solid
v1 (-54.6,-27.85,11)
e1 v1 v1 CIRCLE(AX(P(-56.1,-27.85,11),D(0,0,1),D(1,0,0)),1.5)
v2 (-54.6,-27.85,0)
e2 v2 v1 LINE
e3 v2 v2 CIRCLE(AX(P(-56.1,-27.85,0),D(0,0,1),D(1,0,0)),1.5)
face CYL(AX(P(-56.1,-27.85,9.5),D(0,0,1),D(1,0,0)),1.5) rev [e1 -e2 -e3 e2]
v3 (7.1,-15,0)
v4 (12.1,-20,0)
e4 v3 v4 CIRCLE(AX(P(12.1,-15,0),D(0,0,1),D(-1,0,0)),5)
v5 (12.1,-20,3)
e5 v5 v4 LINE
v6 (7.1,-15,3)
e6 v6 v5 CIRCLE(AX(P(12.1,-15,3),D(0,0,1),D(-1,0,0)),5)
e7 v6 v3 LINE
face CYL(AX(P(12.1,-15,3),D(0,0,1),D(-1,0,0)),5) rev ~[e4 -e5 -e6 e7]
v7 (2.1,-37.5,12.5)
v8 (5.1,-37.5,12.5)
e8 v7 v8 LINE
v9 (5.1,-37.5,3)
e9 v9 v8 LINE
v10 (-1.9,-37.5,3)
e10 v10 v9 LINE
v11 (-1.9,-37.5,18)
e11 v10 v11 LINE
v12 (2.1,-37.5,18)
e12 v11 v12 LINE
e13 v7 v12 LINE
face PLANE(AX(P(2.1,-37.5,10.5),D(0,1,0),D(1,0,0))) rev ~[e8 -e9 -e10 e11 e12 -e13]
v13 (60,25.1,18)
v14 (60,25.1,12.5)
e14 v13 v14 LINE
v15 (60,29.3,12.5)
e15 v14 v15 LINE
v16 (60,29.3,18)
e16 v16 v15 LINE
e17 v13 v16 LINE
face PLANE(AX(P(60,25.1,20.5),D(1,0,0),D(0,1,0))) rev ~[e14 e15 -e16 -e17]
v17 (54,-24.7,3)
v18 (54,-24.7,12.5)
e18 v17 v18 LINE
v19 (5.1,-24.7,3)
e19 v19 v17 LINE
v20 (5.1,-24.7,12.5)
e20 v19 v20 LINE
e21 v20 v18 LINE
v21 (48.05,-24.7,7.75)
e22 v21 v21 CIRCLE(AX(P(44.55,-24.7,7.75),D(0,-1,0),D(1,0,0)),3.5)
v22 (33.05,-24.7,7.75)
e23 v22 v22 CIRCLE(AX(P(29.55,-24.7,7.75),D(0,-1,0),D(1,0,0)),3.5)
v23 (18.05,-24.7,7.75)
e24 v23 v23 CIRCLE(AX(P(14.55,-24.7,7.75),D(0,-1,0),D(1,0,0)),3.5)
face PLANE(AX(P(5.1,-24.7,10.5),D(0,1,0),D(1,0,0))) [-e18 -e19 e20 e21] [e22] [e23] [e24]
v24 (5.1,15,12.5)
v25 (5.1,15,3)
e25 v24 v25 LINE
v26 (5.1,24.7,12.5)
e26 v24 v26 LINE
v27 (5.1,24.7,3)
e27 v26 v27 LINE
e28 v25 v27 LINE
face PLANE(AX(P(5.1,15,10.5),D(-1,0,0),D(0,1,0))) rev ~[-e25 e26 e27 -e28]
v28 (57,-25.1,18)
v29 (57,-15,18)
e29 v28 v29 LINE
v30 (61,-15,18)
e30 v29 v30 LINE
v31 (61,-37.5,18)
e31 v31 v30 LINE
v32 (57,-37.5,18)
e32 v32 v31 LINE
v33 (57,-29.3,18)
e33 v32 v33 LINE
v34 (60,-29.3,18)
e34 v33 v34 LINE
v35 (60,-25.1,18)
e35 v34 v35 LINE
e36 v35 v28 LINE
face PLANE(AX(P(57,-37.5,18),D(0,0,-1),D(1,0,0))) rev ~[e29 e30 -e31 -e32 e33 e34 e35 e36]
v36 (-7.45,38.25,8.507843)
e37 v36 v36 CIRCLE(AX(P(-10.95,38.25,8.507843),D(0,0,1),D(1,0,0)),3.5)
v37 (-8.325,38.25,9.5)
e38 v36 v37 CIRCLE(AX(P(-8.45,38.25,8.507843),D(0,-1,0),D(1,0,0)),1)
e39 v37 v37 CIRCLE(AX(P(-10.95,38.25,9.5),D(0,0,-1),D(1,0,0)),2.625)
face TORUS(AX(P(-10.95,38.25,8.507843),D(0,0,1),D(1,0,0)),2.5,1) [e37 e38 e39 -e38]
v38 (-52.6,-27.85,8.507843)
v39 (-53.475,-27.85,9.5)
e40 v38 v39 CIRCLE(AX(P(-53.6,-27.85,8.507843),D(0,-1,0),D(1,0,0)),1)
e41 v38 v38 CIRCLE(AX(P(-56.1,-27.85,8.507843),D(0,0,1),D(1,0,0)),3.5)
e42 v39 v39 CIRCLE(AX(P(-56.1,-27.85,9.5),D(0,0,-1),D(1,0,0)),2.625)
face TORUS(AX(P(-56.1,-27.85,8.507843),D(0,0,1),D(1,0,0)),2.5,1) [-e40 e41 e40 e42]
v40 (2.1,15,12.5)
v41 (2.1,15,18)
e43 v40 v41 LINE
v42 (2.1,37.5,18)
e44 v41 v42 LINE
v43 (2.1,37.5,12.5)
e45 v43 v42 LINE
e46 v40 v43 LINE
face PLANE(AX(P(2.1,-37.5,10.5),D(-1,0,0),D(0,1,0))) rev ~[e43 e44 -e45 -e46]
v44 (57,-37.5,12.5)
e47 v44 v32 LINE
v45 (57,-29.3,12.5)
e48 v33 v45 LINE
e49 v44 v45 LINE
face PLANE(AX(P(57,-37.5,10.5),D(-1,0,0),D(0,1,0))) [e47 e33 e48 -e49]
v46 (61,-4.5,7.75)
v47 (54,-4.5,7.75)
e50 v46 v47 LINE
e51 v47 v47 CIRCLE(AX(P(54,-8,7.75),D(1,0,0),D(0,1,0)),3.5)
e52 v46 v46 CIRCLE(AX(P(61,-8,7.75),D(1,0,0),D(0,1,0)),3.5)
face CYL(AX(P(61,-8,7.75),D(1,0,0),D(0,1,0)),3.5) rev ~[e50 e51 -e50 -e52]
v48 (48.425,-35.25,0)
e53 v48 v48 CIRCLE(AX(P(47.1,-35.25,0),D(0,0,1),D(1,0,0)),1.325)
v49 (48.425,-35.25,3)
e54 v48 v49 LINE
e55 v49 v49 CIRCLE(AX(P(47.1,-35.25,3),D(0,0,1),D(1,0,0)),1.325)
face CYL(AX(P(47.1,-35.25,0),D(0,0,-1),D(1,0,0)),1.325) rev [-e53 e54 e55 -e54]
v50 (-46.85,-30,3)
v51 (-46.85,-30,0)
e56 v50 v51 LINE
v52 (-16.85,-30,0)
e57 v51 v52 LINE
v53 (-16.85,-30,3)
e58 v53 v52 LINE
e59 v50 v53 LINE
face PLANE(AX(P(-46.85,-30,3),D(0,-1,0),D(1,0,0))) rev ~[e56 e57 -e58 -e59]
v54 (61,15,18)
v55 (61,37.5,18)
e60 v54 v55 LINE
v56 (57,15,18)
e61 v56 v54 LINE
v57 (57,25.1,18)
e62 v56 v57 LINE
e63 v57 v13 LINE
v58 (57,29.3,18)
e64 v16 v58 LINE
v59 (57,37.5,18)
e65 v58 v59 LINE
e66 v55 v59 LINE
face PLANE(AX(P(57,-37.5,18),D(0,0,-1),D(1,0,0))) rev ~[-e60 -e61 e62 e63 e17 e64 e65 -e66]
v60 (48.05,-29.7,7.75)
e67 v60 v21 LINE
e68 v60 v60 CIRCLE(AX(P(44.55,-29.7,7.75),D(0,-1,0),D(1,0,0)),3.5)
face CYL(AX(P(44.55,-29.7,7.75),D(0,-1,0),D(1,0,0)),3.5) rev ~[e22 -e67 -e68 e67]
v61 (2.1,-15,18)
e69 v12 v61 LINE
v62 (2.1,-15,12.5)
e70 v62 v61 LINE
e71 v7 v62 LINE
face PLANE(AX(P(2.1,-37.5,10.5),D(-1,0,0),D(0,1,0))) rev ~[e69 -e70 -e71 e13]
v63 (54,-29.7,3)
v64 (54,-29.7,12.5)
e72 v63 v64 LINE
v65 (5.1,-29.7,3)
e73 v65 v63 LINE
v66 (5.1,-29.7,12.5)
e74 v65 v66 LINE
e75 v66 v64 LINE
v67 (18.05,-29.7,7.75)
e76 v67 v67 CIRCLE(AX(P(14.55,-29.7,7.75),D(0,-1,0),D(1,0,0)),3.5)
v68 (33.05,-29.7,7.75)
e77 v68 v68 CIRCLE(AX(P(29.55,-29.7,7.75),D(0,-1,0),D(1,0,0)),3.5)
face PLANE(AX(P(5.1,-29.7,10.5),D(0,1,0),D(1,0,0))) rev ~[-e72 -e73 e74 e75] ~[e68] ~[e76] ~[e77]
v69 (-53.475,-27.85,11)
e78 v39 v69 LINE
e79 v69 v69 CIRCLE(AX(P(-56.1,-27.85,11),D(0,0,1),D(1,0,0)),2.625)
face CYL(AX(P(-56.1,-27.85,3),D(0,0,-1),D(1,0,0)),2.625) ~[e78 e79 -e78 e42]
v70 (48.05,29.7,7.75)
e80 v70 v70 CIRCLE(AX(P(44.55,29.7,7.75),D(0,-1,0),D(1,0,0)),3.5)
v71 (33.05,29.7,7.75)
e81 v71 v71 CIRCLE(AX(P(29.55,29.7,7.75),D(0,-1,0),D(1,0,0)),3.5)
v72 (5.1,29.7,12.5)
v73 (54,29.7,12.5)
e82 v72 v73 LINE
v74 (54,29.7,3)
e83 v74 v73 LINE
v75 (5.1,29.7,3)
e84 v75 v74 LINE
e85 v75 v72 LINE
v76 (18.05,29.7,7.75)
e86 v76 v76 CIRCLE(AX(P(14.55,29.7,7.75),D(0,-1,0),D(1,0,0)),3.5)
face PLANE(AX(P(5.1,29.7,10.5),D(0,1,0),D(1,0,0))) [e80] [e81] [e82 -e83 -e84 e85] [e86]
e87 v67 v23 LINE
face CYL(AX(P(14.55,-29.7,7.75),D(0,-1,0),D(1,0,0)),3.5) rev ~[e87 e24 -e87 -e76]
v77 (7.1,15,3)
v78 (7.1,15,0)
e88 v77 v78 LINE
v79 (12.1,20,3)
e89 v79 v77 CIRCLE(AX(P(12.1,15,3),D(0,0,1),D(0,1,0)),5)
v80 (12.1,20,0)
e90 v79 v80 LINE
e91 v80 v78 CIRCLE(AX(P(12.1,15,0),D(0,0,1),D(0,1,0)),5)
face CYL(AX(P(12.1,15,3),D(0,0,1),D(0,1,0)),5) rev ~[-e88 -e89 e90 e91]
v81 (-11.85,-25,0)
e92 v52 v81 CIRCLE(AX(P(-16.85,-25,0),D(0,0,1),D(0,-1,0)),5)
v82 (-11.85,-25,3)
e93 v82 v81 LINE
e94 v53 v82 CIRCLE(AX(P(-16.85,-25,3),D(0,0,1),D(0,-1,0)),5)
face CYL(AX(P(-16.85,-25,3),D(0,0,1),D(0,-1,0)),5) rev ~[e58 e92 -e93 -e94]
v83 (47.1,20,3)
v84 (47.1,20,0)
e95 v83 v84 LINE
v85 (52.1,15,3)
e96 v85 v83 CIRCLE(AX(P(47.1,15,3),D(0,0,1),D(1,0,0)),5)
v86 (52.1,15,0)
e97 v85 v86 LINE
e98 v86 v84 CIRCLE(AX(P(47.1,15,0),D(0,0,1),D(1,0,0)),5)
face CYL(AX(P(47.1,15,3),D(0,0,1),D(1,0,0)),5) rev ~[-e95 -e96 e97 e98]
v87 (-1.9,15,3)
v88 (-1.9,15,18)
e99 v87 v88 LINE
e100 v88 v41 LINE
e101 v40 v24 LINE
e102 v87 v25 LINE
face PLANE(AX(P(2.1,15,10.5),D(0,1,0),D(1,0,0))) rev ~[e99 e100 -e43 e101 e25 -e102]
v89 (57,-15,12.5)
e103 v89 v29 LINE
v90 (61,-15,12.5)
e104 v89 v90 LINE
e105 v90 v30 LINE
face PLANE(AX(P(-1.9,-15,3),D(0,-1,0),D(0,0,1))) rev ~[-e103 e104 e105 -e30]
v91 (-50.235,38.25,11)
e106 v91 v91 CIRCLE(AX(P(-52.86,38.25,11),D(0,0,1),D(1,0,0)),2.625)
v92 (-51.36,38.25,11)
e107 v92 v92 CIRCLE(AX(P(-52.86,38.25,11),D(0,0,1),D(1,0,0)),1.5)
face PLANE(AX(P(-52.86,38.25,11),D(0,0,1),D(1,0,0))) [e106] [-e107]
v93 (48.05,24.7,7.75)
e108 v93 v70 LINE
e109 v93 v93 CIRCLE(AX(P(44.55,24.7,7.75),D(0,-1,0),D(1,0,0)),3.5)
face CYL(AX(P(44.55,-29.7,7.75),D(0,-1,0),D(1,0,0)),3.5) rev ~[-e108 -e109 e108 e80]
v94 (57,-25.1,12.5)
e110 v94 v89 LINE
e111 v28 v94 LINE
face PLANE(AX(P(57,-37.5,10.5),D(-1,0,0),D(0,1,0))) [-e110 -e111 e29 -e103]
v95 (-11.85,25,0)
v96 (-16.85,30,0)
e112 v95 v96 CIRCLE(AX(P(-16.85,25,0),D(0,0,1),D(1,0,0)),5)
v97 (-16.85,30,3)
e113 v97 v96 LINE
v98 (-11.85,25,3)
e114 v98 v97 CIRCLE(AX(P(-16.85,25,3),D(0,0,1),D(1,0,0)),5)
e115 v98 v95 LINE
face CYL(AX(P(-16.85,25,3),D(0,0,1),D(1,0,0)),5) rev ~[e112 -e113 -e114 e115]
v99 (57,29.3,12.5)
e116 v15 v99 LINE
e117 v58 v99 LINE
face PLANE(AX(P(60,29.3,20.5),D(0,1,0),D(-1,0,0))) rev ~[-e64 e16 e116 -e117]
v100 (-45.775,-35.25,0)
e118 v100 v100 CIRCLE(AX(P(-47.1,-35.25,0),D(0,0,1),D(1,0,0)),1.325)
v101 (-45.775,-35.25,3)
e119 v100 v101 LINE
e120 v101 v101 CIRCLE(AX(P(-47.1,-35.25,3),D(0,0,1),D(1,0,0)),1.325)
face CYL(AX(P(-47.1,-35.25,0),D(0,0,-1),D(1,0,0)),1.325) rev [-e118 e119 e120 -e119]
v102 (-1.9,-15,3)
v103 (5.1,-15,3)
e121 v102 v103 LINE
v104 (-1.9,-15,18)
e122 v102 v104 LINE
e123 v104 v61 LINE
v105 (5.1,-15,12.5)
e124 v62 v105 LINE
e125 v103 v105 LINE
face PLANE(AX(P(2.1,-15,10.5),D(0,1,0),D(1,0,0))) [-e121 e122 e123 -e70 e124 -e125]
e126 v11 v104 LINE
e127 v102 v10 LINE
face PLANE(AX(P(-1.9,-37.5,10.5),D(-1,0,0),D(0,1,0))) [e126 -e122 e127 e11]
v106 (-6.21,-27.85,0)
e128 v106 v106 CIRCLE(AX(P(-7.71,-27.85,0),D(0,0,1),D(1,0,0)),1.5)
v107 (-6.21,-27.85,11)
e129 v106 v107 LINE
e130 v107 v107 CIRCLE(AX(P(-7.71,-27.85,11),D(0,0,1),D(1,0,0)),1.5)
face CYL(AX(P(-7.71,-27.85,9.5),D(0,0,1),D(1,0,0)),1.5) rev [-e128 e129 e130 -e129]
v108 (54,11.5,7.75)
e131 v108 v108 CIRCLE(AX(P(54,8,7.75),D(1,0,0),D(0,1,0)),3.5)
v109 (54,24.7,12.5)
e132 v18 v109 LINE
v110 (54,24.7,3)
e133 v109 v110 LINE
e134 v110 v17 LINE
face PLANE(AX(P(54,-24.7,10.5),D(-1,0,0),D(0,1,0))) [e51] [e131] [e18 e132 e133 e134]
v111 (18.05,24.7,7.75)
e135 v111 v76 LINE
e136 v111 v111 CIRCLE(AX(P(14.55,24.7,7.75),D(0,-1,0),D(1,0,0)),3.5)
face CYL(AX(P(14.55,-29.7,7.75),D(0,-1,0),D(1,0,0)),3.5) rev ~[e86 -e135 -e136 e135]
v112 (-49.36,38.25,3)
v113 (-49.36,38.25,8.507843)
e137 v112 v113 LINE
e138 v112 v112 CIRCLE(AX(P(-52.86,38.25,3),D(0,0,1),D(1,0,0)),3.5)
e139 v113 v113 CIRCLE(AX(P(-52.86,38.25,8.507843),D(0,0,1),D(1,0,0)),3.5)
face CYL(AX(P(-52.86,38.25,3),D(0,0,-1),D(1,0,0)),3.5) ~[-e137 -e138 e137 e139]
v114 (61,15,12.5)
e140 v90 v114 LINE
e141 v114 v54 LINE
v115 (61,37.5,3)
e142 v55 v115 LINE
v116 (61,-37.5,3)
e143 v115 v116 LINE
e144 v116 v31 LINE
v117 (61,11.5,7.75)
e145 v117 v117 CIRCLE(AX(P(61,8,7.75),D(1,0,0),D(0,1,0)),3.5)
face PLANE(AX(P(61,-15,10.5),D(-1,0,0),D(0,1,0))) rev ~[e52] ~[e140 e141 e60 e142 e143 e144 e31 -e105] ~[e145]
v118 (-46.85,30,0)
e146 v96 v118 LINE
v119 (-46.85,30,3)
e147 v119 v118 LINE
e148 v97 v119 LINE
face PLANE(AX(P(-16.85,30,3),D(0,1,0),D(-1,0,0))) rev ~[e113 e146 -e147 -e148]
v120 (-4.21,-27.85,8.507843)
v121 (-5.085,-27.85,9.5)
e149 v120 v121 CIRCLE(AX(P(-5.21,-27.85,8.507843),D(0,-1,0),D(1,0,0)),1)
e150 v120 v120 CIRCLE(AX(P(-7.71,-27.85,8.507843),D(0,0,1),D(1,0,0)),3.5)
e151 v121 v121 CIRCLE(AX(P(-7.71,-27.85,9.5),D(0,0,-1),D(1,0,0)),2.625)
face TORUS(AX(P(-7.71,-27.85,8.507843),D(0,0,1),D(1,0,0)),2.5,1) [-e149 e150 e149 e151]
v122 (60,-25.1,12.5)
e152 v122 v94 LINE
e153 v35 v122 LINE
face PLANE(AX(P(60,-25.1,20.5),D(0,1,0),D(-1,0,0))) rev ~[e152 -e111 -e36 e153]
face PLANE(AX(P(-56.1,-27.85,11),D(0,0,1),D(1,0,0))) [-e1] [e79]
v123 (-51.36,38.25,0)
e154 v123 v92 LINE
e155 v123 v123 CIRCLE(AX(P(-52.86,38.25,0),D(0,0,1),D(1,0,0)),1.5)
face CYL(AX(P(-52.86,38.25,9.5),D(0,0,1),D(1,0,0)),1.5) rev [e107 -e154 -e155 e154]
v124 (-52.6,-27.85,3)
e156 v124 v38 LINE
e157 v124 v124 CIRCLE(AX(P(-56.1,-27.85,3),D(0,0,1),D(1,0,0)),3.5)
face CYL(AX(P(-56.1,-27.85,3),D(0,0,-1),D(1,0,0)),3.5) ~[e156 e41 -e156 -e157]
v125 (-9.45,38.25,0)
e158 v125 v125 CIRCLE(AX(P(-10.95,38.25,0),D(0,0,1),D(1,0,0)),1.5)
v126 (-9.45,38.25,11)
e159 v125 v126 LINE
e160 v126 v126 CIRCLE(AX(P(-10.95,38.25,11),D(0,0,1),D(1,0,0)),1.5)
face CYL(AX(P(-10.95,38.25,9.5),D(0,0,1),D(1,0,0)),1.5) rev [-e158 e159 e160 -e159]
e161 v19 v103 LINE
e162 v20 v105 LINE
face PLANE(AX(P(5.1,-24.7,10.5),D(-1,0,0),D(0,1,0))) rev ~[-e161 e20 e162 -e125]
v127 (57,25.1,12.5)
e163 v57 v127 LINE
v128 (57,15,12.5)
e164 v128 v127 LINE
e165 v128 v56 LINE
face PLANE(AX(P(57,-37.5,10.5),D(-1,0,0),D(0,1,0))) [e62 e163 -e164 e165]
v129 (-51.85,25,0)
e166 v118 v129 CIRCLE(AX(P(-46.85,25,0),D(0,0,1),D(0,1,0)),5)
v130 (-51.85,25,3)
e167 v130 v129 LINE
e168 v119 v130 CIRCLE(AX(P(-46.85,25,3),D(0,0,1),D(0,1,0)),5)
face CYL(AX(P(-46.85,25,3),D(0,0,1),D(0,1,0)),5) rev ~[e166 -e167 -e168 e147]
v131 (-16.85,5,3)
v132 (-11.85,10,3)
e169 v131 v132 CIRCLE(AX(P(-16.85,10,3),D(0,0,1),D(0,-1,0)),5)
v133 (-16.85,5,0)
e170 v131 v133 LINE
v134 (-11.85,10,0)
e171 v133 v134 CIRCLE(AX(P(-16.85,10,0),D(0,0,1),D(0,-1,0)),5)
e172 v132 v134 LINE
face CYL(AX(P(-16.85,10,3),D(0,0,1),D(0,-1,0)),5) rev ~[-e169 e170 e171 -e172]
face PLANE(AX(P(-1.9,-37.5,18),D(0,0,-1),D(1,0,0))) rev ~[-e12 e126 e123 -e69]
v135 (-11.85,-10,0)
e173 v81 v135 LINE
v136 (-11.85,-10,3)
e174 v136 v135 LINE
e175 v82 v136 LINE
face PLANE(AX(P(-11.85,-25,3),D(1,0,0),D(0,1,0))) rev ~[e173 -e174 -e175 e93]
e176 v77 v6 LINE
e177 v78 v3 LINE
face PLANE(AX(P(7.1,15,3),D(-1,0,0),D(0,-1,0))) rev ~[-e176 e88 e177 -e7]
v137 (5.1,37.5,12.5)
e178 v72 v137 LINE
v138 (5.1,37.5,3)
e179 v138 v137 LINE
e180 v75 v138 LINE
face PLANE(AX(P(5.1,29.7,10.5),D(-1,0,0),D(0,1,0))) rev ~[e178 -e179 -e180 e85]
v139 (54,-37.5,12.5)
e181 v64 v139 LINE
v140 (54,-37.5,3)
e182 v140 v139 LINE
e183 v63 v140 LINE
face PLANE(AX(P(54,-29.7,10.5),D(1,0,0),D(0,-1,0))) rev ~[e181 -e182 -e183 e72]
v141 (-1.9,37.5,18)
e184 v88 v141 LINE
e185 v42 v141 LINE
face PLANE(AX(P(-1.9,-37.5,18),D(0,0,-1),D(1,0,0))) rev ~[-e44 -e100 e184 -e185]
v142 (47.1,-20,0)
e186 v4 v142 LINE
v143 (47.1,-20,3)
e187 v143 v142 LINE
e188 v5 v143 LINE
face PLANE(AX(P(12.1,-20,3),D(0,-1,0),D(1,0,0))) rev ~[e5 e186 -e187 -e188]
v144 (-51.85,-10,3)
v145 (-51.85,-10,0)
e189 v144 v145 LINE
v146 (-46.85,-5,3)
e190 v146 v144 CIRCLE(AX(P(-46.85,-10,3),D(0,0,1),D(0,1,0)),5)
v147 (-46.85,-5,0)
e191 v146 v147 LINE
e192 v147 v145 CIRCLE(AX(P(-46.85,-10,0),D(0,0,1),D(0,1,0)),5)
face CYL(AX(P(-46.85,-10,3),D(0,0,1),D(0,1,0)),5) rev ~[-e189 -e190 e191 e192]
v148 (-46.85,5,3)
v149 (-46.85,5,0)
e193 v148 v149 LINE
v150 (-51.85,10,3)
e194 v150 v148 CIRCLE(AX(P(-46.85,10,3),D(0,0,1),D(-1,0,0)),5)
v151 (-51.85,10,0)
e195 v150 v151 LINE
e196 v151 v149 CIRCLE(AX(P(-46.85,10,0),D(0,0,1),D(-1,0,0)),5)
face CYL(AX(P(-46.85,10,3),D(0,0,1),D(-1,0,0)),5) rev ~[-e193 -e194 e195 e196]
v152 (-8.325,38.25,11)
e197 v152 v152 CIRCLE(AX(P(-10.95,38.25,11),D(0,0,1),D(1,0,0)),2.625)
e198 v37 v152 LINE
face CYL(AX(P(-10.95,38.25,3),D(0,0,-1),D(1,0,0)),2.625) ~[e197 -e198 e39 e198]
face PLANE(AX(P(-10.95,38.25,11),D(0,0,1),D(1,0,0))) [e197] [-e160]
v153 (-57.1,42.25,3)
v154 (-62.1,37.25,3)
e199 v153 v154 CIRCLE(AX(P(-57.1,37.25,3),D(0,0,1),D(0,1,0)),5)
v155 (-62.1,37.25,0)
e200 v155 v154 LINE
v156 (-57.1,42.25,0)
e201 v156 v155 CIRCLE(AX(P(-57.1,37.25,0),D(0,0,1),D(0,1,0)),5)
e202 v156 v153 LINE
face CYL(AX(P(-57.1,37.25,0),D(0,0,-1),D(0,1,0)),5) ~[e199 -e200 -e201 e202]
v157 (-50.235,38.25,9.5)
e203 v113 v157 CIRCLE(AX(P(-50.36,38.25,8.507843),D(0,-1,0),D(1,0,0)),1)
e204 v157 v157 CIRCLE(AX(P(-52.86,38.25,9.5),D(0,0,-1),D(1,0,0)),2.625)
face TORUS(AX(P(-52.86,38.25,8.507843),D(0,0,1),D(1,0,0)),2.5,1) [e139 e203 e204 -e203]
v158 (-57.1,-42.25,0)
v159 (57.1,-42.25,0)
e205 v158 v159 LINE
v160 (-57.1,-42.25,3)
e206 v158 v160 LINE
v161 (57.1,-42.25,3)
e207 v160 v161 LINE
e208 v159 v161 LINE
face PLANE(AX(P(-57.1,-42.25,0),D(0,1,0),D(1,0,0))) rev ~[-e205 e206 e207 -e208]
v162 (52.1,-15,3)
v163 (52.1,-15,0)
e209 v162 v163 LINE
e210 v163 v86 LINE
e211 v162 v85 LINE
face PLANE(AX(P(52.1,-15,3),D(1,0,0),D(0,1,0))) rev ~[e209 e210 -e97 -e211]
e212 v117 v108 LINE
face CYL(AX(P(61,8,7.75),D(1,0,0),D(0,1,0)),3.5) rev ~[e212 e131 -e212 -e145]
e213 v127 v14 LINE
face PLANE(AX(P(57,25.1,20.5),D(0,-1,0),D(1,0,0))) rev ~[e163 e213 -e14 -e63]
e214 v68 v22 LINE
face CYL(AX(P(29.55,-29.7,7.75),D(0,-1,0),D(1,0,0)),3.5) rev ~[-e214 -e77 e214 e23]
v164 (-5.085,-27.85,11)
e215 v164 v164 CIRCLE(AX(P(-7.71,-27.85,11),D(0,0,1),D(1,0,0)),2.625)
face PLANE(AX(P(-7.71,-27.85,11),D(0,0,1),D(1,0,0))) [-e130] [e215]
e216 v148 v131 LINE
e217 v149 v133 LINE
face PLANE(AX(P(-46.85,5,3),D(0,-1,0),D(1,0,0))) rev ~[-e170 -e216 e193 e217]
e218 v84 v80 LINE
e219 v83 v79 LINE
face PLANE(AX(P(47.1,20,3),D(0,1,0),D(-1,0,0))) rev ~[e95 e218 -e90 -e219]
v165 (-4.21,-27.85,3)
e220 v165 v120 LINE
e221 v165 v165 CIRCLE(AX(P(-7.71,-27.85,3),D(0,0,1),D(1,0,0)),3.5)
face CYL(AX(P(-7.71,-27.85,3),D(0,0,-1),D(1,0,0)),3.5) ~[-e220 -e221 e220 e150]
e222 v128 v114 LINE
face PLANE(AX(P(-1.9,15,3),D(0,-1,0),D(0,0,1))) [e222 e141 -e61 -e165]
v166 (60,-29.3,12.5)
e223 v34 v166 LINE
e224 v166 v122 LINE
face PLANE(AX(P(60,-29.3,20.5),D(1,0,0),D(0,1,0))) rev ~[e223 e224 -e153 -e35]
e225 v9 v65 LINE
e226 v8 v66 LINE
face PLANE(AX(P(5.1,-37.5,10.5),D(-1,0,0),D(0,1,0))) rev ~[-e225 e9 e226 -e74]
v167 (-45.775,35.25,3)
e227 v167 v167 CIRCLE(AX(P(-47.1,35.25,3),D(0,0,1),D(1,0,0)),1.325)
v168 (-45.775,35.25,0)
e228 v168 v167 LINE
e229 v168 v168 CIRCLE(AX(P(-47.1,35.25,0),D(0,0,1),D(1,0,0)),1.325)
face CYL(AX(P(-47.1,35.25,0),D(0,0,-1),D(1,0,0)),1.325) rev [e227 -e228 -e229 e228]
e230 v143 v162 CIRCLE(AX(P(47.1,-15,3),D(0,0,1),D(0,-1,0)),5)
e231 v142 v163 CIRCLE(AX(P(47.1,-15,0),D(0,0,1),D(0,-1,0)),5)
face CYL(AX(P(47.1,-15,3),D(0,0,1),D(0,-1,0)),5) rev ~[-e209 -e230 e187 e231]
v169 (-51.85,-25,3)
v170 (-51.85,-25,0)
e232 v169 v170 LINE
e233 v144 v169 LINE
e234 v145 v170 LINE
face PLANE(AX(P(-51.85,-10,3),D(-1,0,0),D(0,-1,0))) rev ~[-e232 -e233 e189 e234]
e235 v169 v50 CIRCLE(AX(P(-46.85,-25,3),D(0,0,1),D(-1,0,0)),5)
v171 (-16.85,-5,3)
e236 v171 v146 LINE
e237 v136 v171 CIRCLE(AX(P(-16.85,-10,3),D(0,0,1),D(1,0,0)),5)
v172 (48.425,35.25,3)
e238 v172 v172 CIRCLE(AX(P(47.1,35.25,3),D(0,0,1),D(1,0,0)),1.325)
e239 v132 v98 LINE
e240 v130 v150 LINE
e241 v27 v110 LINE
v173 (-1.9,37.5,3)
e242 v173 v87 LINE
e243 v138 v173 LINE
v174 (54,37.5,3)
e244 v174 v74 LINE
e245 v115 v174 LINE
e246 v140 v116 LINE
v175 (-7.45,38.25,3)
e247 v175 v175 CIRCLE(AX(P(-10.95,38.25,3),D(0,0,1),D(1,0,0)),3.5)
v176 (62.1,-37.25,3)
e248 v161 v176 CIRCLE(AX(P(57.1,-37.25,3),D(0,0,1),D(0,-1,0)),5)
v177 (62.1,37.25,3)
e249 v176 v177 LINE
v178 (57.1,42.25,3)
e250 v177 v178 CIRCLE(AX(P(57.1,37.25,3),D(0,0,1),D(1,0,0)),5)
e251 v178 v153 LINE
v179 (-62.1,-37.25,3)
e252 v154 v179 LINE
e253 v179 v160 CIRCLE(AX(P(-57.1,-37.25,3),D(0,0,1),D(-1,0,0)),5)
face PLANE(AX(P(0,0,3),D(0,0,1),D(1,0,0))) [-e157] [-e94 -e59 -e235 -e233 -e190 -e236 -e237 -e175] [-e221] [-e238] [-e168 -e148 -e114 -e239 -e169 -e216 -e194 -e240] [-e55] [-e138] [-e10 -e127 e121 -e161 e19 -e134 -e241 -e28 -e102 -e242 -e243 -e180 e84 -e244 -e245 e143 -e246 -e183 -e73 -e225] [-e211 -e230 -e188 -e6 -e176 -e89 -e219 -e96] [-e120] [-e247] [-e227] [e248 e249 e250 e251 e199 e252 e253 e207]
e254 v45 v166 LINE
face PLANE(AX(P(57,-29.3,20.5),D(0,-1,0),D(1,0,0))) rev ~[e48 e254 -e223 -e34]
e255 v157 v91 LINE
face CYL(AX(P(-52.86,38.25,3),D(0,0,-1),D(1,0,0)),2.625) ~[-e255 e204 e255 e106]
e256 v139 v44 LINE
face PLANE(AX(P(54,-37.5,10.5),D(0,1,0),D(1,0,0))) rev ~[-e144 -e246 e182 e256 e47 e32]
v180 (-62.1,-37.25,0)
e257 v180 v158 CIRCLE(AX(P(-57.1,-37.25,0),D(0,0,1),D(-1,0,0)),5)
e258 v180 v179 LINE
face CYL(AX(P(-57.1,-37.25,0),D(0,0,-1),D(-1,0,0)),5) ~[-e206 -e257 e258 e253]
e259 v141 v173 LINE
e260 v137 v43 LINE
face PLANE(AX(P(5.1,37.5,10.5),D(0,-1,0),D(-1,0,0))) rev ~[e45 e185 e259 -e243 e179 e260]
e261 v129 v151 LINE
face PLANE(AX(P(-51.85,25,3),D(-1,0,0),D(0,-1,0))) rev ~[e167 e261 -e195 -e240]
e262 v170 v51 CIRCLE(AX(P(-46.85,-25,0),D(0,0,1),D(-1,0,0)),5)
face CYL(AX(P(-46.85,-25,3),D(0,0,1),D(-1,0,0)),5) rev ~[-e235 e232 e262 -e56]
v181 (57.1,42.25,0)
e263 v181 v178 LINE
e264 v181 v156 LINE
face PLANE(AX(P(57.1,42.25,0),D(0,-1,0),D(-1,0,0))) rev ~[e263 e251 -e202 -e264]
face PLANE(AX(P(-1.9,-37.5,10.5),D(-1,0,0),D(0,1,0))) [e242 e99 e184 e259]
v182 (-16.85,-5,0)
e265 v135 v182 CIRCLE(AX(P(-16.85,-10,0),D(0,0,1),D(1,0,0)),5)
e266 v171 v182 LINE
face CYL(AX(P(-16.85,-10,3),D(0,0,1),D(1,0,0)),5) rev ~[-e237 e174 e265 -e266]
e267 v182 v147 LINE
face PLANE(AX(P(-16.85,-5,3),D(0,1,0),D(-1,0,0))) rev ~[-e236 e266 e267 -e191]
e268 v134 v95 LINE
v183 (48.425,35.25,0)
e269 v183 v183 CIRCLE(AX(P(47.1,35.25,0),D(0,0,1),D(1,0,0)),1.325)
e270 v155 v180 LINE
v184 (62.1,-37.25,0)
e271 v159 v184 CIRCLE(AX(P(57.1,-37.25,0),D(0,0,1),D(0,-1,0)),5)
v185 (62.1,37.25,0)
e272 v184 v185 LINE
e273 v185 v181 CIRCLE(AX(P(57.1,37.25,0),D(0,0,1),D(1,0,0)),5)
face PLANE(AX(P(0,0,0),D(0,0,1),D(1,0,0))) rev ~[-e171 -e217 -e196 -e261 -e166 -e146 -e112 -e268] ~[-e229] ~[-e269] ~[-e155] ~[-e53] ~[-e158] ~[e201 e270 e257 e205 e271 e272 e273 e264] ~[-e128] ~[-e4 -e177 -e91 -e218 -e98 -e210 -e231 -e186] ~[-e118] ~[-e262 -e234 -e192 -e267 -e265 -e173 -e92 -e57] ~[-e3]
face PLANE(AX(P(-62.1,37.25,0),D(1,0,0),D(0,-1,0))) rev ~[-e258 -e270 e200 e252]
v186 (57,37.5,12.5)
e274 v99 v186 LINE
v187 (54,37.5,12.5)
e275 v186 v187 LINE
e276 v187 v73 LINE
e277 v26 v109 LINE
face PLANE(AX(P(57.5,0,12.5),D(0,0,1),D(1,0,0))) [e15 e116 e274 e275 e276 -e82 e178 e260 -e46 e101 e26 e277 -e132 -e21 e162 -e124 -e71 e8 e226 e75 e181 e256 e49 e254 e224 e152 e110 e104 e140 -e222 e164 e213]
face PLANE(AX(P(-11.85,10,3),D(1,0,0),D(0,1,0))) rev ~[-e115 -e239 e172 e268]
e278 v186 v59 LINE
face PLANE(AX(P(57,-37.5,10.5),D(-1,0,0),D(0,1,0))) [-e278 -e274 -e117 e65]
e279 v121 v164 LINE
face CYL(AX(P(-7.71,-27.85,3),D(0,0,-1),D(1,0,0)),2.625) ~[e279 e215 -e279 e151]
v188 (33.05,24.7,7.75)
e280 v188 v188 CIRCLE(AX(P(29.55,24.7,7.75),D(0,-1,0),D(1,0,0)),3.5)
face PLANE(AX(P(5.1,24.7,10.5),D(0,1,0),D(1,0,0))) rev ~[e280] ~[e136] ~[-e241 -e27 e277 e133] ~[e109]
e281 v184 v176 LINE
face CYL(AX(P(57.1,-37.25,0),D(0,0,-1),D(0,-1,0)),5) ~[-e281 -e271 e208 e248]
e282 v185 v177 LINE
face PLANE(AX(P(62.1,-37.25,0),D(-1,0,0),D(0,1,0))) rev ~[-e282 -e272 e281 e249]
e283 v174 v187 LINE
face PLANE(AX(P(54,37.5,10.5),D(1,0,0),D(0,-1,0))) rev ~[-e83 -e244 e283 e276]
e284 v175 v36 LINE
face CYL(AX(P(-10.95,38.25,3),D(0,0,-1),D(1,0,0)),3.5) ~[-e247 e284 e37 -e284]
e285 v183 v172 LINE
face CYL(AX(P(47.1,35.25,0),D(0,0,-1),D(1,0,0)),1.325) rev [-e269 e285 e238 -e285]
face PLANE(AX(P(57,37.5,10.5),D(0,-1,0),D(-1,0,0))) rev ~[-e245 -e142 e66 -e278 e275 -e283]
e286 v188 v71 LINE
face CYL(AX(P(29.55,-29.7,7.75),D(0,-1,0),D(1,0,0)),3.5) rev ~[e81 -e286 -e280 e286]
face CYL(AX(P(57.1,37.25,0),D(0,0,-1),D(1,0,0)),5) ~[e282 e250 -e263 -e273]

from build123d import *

# Parameters (mm, degrees)
F0_R      = 1.325
F1_DEPTH  = 3
F2_R      = 2.625
F2_R_2    = 1.5
F3_DEPTH  = 8
F4_R      = 3.5
F5_DEPTH  = 6.5
F7_DEPTH  = 7.5
F8_W      = 4
F8_H      = 75
F9_DEPTH  = 10
F10_W     = 4
F10_H     = 75
F11_DEPTH = 10
F13_DEPTH = 10
F14_W     = 30
F14_H     = 17.5
F15_DEPTH = 64.001
F16_W     = 4
F16_H     = 2.5
F17_DEPTH = 79.751
F20_DEPTH = 3.001
F18_W     = 48.9
F18_H     = 5
F21_DEPTH = 7.5
F23_DEPTH = 3.001
F24_W     = 4
F24_H     = 2.5
F25_DEPTH = 79.751
F26_DEPTH = 9.501
F27_W     = 7
F27_H     = 30
F28_DEPTH = 7.5
F30_DEPTH = 2
F31_R     = 3.5
F32_DEPTH = 71.951
F33_R     = 3.5
F34_DEPTH = 123.101


# Not quite as in the source:
# - a fillet or chamfer that OpenCascade refuses, or shapes differently, is made with other operations: its cross-section is extruded or revolved along the edge and cut away or added


with BuildPart() as f1:
    # F0 (on Top) → F1 (new body)
    with BuildSketch(Plane.XY):
        with BuildLine():
            Line((57.1, 42.25), (0, 42.25))
            Line((0, 42.25), (-57.1, 42.25))
            ThreePointArc((-57.1, 42.25), (-60.6355339059, 40.7855339059), (-62.1, 37.25))
            Line((-62.1, 37.25), (-62.1, 0))
            Line((-62.1, 0), (-62.1, -37.25))
            ThreePointArc((-62.1, -37.25), (-60.6355339059, -40.7855339059), (-57.1, -42.25))
            Line((-57.1, -42.25), (0, -42.25))
            Line((0, -42.25), (57.1, -42.25))
            ThreePointArc((57.1, -42.25), (60.6355339059, -40.7855339059), (62.1, -37.25))
            Line((62.1, -37.25), (62.1, 0))
            Line((62.1, 0), (62.1, 37.25))
            ThreePointArc((62.1, 37.25), (60.6355339059, 40.7855339059), (57.1, 42.25))
        make_face()
        with Locations((-47.1, -35.25)):
            Circle(F0_R, mode=Mode.SUBTRACT)
        with Locations((47.1, -35.25)):
            Circle(F0_R, mode=Mode.SUBTRACT)
        with Locations((-47.1, 35.25)):
            Circle(F0_R, mode=Mode.SUBTRACT)
        with Locations((47.1, 35.25)):
            Circle(F0_R, mode=Mode.SUBTRACT)
    extrude(amount=F1_DEPTH)

    # F2 (on face) → F3 (join)
    with BuildSketch(Plane.XY.offset(3)):
        with Locations((-56.1, -27.85)):
            Circle(F2_R)
        with Locations((-56.1, -27.85)):
            Circle(F2_R_2, mode=Mode.SUBTRACT)
        with Locations((-7.71, -27.85)):
            Circle(F2_R)
        with Locations((-7.71, -27.85)):
            Circle(F2_R_2, mode=Mode.SUBTRACT)
        with Locations((-52.86, 38.25)):
            Circle(F2_R)
        with Locations((-52.86, 38.25)):
            Circle(F2_R_2, mode=Mode.SUBTRACT)
        with Locations((-10.95, 38.25)):
            Circle(F2_R)
        with Locations((-10.95, 38.25)):
            Circle(F2_R_2, mode=Mode.SUBTRACT)
    extrude(amount=F3_DEPTH)

    # F4 (on face) → F5 (join)
    with BuildSketch(Plane.XY.offset(3)):
        with Locations((-10.95, 38.25)):
            Circle(F4_R)
        with Locations((-7.71, -27.85)):
            Circle(F4_R)
        with Locations((-56.1, -27.85)):
            Circle(F4_R)
        with Locations((-52.86, 38.25)):
            Circle(F4_R)
    extrude(amount=F5_DEPTH)

    # F6 (on face) → F7 (join)
    with BuildSketch(Plane.XY.offset(3)):
        Polygon((5.1, 37.5), (2.1, 37.5), (-1.9, 37.5), (-1.9, -37.5), (2.1, -37.5), (5.1, -37.5), align=None)
        Polygon((61, 37.5), (57, 37.5), (54, 37.5), (54, -37.5), (57, -37.5), (61, -37.5), align=None)
    extrude(amount=F7_DEPTH)

    # F8 (on face) → F9 (join)
    with BuildSketch(Plane.XY.offset(10.5)):
        with Locations((0.1, 0)):
            Rectangle(F8_W, F8_H)
    extrude(amount=F9_DEPTH)

    # F10 (on face) → F11 (join)
    with BuildSketch(Plane.XY.offset(10.5)):
        with Locations((59, 0)):
            Rectangle(F10_W, F10_H)
    extrude(amount=F11_DEPTH)

    # F12 (on face) → F13 (cut)
    with BuildSketch(Plane.XY.offset(20.5)):
        Polygon((60, -25.1), (57, -25.1), (57, -29.3), (60, -29.3), (60, -27.2), align=None)
        Polygon((60, 27.2), (60, 29.3), (57, 29.3), (57, 25.1), (60, 25.1), align=None)
    extrude(amount=-F13_DEPTH, mode=Mode.SUBTRACT)

    # F14 (on face) → F15 (cut, through all)
    with BuildSketch(Plane(origin=(-1.9, 0, 0), x_dir=(0, -1, 0), z_dir=(-1, 0, 0))):
        with Locations((0, 11.75)):
            Rectangle(F14_W, F14_H)
    extrude(amount=-F15_DEPTH, mode=Mode.SUBTRACT)

    # F16 (on face) → F17 (cut, through all)
    with BuildSketch(Plane.XZ.offset(37.5)):
        with Locations((0.1, 19.25)):
            Rectangle(F16_W, F16_H)
    extrude(amount=-F17_DEPTH, mode=Mode.SUBTRACT)

    # F19 (on face) → F20 (cut, through all)
    with BuildSketch(Plane.XY.offset(3)):
        with BuildLine():
            Line((47.1, 20), (12.1, 20))
            ThreePointArc((12.1, 20), (8.5644660941, 18.5355339059), (7.1, 15))
            Line((7.1, 15), (7.1, -15))
            ThreePointArc((7.1, -15), (8.5644660941, -18.5355339059), (12.1, -20))
            Line((12.1, -20), (47.1, -20))
            ThreePointArc((47.1, -20), (50.6355339059, -18.5355339059), (52.1, -15))
            Line((52.1, -15), (52.1, 15))
            ThreePointArc((52.1, 15), (50.6355339059, 18.5355339059), (47.1, 20))
        make_face()
    extrude(amount=-F20_DEPTH, mode=Mode.SUBTRACT)

    # F18 (on face) → F21 (join)
    with BuildSketch(Plane.XY.offset(3)):
        with Locations((29.55, -27.2)):
            Rectangle(F18_W, F18_H)
        with Locations((29.55, 27.2)):
            Rectangle(F18_W, F18_H)
    extrude(amount=F21_DEPTH)

    # F22 (on face) → F23 (cut, through all)
    with BuildSketch(Plane.XY.offset(3)):
        with BuildLine():
            Line((-16.85, 30), (-46.85, 30))
            ThreePointArc((-46.85, 30), (-50.3855339059, 28.5355339059), (-51.85, 25))
            Line((-51.85, 25), (-51.85, 10))
            ThreePointArc((-51.85, 10), (-50.3855339059, 6.4644660941), (-46.85, 5))
            Line((-46.85, 5), (-16.85, 5))
            ThreePointArc((-16.85, 5), (-13.3144660941, 6.4644660941), (-11.85, 10))
            Line((-11.85, 10), (-11.85, 25))
            ThreePointArc((-11.85, 25), (-13.3144660941, 28.5355339059), (-16.85, 30))
        make_face()
        with BuildLine():
            Line((-46.85, -30), (-16.85, -30))
            ThreePointArc((-16.85, -30), (-13.3144660941, -28.5355339059), (-11.85, -25))
            Line((-11.85, -25), (-11.85, -10))
            ThreePointArc((-11.85, -10), (-13.3144660941, -6.4644660941), (-16.85, -5))
            Line((-16.85, -5), (-46.85, -5))
            ThreePointArc((-46.85, -5), (-50.3855339059, -6.4644660941), (-51.85, -10))
            Line((-51.85, -10), (-51.85, -25))
            ThreePointArc((-51.85, -25), (-50.3855339059, -28.5355339059), (-46.85, -30))
        make_face()
    extrude(amount=-F23_DEPTH, mode=Mode.SUBTRACT)

    # F24 (on face) → F25 (cut, through all)
    with BuildSketch(Plane.XZ.offset(37.5)):
        with Locations((59, 19.25)):
            Rectangle(F24_W, F24_H)
    extrude(amount=-F25_DEPTH, mode=Mode.SUBTRACT)

    # F26 (cut, through all): faces of the model
    f26_faces = [f1.faces().sort_by_distance(p)[0] for p in [
        (-52.86, 38.25, 9.5),
        (-10.95, 38.25, 9.5),
        (-7.71, -27.85, 9.5),
        (-56.1, -27.85, 9.5),
    ]]
    extrude(f26_faces, amount=-F26_DEPTH, mode=Mode.SUBTRACT)

    # F27 (on face) → F28 (join)
    with BuildSketch(Plane.XY.offset(3)):
        with Locations((57.5, 0)):
            Rectangle(F27_W, F27_H)
    extrude(amount=F28_DEPTH)

    # F29: fillet of radius 1 on 4 edges, made by hand

    # F29_s1 → F29_t2 (revolve, cut)
    with BuildSketch(Plane.XZ.offset(-38.25)):
        with BuildLine():
            ThreePointArc((-49.36, 8.5078432584), (-49.61, 9.1692810861), (-50.235, 9.5))
            Line((-50.235, 9.5), (-49.36, 9.5))
            Line((-49.36, 9.5), (-49.36, 8.5078432584))
        make_face()
    revolve(axis=Axis((-52.86, 38.25, 9.5), (0, 0, 1)), mode=Mode.SUBTRACT)

    # F29_s3 → F29_t4 (revolve, cut)
    with BuildSketch(Plane.XZ.offset(-38.25)):
        with BuildLine():
            ThreePointArc((-7.45, 8.5078432584), (-7.7, 9.1692810861), (-8.325, 9.5))
            Line((-8.325, 9.5), (-7.45, 9.5))
            Line((-7.45, 9.5), (-7.45, 8.5078432584))
        make_face()
    revolve(axis=Axis((-10.95, 38.25, 9.5), (0, 0, 1)), mode=Mode.SUBTRACT)

    # F29_s5 → F29_t6 (revolve, cut)
    with BuildSketch(Plane.XZ.offset(27.85)):
        with BuildLine():
            ThreePointArc((-4.21, 8.5078432584), (-4.46, 9.1692810861), (-5.085, 9.5))
            Line((-5.085, 9.5), (-4.21, 9.5))
            Line((-4.21, 9.5), (-4.21, 8.5078432584))
        make_face()
    revolve(axis=Axis((-7.71, -27.85, 9.5), (0, 0, 1)), mode=Mode.SUBTRACT)

    # F29_s7 → F29_t8 (revolve, cut)
    with BuildSketch(Plane.XZ.offset(27.85)):
        with BuildLine():
            ThreePointArc((-52.6, 8.5078432584), (-52.85, 9.1692810861), (-53.475, 9.5))
            Line((-53.475, 9.5), (-52.6, 9.5))
            Line((-52.6, 9.5), (-52.6, 8.5078432584))
        make_face()
    revolve(axis=Axis((-56.1, -27.85, 9.5), (0, 0, 1)), mode=Mode.SUBTRACT)

    # F30 (add): a face of the model
    f30_faces = [f1.faces().sort_by_distance(p)[0] for p in [
        (3.6, -36.5463643253, 10.5),
    ]]
    extrude(f30_faces, amount=F30_DEPTH)

    # F31 (on face) → F32 (cut, through all)
    with BuildSketch(Plane.XZ.offset(29.7)):
        with Locations((29.55, 7.75)):
            Circle(F31_R)
        with Locations((14.55, 7.75)):
            Circle(F31_R)
        with Locations((44.55, 7.75)):
            Circle(F31_R)
    extrude(amount=-F32_DEPTH, mode=Mode.SUBTRACT)

    # F33 (on face) → F34 (cut, through all)
    with BuildSketch(Plane.YZ.offset(61)):
        with Locations((-8, 7.75)):
            Circle(F33_R)
        with Locations((8, 7.75)):
            Circle(F33_R)
    extrude(amount=-F34_DEPTH, mode=Mode.SUBTRACT)


solid = f1.part
